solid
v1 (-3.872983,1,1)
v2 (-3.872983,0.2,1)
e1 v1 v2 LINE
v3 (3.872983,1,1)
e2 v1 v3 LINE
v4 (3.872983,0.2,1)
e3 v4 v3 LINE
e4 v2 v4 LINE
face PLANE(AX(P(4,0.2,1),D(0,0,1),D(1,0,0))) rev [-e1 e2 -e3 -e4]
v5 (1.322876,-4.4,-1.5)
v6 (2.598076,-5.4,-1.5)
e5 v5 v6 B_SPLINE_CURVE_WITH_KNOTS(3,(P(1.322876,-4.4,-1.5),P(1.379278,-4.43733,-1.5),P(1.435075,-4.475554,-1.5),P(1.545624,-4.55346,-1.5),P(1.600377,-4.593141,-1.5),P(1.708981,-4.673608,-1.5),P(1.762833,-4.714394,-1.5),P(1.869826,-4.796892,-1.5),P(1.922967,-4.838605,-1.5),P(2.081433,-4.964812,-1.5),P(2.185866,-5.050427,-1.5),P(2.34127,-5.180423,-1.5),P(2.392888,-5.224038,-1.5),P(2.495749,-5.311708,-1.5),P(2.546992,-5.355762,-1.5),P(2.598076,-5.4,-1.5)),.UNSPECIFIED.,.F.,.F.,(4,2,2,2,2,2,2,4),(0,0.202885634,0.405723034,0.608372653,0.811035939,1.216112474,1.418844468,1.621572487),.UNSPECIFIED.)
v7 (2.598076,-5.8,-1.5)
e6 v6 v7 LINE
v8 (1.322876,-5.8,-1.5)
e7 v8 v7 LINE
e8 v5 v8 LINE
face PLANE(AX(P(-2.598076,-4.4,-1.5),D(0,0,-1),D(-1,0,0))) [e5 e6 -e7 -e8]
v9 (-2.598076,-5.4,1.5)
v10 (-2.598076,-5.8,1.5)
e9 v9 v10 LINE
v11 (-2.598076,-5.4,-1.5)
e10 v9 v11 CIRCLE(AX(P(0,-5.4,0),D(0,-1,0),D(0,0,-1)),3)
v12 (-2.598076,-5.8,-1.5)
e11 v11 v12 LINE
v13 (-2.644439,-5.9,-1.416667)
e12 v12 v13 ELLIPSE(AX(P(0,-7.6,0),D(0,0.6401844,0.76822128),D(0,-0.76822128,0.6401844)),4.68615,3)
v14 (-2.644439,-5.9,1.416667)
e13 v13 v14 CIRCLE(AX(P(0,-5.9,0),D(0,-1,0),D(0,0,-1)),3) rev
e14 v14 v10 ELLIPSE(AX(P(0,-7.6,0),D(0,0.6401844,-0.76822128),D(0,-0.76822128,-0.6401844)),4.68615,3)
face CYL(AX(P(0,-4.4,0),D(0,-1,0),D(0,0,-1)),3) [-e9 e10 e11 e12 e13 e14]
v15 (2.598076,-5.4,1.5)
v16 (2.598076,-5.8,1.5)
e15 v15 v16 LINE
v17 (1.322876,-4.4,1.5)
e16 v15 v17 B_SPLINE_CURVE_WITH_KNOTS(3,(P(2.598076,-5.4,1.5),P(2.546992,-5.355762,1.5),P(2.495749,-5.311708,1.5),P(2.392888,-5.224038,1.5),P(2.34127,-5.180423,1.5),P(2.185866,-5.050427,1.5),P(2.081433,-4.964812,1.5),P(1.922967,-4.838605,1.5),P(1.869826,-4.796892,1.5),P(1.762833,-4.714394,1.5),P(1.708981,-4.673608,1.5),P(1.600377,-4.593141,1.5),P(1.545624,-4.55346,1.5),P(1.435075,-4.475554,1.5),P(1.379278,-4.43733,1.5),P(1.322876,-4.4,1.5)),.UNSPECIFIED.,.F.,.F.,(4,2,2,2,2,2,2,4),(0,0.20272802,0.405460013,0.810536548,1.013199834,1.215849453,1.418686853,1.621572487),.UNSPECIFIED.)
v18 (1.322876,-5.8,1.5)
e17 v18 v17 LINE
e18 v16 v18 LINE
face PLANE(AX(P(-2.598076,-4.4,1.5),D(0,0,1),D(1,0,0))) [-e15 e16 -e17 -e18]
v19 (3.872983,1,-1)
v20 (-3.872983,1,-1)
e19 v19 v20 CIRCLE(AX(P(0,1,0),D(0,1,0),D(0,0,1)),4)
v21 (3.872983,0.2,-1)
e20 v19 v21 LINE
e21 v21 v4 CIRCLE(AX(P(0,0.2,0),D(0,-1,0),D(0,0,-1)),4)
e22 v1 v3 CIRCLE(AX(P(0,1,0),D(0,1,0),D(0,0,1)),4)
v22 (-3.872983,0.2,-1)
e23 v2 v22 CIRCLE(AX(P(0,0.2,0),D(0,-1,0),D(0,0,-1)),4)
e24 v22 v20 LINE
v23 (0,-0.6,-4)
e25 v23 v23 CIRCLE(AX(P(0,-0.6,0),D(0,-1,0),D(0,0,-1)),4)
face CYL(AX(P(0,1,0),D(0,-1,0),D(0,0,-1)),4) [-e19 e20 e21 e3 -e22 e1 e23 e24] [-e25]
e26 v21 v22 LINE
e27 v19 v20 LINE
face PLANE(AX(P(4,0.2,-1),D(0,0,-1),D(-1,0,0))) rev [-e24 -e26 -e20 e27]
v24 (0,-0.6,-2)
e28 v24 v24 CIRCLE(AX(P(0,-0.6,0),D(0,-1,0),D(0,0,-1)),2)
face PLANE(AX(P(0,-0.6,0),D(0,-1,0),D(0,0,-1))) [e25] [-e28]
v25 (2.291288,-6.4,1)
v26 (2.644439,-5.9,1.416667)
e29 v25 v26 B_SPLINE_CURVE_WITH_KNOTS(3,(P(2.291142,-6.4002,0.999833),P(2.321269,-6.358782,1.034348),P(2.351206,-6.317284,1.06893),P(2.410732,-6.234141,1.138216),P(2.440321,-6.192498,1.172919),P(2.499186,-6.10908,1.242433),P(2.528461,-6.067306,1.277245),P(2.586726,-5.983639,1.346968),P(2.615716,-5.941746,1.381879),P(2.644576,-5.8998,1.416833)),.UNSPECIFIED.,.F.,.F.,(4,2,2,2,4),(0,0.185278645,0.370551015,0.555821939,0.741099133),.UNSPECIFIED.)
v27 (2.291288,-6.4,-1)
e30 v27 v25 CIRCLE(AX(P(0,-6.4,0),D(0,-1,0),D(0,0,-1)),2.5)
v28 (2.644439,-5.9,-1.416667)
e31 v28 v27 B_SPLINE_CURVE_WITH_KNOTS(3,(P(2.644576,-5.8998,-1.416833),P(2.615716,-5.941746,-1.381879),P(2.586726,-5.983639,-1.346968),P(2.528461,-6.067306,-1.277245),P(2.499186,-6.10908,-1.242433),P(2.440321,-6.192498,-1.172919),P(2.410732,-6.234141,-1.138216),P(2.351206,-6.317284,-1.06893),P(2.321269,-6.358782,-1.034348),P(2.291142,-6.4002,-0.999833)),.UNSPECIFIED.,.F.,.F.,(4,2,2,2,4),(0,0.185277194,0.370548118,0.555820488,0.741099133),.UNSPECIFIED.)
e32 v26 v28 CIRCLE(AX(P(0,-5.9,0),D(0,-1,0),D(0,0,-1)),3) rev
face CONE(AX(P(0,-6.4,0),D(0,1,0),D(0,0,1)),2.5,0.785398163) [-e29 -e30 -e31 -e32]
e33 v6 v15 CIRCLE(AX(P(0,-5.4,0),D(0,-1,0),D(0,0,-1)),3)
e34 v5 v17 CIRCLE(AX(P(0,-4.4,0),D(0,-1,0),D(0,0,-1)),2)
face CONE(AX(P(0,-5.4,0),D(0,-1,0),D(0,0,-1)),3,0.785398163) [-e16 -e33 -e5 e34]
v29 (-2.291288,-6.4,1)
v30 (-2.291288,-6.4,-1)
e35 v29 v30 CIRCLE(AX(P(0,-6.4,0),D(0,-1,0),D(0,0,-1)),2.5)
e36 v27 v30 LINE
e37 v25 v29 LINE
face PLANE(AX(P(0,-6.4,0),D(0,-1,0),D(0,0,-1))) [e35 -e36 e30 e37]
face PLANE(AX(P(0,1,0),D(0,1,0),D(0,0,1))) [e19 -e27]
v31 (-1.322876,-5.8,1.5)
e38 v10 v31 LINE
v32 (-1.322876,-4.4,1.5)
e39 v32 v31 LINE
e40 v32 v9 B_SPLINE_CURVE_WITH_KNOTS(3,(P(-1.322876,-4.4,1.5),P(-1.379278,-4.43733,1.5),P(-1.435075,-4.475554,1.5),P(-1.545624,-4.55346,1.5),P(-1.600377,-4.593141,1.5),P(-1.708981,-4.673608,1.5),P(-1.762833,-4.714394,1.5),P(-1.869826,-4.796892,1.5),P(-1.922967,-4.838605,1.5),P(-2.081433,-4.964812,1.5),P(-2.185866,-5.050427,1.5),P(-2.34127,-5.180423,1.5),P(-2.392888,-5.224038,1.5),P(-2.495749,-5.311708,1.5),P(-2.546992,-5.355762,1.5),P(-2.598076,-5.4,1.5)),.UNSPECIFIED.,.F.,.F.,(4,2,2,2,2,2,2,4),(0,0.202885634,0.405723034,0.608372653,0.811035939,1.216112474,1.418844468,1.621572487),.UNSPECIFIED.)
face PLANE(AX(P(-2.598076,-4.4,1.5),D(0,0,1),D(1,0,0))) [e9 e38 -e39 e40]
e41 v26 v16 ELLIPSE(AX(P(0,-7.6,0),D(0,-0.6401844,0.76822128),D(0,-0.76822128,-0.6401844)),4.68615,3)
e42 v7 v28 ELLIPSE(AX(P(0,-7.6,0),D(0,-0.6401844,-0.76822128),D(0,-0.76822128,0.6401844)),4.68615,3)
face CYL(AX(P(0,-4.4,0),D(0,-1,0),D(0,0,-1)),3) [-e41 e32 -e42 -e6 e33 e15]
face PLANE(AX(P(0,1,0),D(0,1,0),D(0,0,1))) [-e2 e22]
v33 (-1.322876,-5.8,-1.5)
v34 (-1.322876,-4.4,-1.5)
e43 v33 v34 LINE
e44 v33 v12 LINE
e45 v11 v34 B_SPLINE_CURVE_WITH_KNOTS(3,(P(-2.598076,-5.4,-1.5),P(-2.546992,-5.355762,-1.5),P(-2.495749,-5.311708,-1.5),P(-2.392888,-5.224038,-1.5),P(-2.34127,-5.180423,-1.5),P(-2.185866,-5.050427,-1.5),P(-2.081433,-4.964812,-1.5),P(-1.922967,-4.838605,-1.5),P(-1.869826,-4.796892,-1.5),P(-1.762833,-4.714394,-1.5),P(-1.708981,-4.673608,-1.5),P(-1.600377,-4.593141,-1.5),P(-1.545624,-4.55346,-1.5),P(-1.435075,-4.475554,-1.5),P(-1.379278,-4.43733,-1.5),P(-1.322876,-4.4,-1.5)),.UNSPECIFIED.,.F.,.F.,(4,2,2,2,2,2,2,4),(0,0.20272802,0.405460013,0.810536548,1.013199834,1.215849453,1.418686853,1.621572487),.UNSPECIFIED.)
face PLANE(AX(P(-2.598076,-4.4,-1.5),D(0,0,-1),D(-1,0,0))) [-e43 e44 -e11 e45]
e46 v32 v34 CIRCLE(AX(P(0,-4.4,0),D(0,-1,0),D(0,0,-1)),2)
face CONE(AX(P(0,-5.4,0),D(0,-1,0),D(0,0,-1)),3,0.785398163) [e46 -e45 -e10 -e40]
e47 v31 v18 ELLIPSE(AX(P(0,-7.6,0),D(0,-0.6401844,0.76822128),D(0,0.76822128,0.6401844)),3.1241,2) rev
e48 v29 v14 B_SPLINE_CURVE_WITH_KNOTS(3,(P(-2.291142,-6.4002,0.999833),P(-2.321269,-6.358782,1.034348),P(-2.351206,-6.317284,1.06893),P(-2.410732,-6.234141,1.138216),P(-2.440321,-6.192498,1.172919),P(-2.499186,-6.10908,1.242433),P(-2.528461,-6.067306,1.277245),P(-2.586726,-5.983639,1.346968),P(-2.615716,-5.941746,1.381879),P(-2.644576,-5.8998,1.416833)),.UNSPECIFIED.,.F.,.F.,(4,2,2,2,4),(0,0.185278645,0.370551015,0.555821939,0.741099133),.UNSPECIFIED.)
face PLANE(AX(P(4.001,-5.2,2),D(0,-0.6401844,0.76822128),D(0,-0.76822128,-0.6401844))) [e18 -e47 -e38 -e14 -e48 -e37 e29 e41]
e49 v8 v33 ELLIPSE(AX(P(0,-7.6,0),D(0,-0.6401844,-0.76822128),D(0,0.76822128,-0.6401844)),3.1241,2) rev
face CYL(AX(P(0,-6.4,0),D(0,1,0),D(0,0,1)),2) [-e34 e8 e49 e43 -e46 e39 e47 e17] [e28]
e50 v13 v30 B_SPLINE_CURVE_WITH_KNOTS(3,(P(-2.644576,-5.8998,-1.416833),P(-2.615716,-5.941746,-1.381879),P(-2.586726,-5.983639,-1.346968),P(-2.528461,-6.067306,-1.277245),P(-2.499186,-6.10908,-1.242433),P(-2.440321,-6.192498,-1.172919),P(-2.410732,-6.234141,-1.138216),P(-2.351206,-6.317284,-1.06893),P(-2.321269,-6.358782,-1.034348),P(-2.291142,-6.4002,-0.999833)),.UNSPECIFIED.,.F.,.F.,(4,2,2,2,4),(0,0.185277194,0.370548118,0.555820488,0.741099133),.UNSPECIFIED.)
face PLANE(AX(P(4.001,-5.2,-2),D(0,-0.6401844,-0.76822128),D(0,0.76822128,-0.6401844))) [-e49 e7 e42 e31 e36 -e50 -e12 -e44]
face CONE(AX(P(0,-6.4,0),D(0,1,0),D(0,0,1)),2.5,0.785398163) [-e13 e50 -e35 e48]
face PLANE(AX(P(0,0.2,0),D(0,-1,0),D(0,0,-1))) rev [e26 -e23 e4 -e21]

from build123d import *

# Parameters (mm, degrees)
SKETCH_1_R                      = 4
EXTRUDE_1_DEPTH                 = 1
SKETCH_3_R                      = 2
EXTRUDE_3_DEPTH                 = 6.4
EXTRUDE_4_DEPTH                 = 2
CHAMFER_1_SIZE                  = 0.5
CHAMFER_2_SIZE                  = 1
CUT_EXTRUDE_1_REACH             = 10.542
CUT_EXTRUDE_1_DIRECTION_2_REACH = 10.542
EXTRUDE_START                   = 0.6
SKETCH_6_R                      = 4
EXTRUDE_5_DEPTH                 = 0.6
SKETCH_7_W                      = 8
SKETCH_7_H                      = 2
CUT_EXTRUDE_2_DEPTH             = 0.8


with BuildPart() as part:
    # 草图1 → 凸台-拉伸1 (new body)
    with BuildSketch(Plane(origin=(0, 0, 0), x_dir=(1, 0, 0), z_dir=(0, 1, 0))):
        with Locations(Location((0, 0, 0), (0, 0, 270))):
            Circle(SKETCH_1_R)
    extrude(amount=EXTRUDE_1_DEPTH)

    # 草图3 → 凸台-拉伸3 (add)
    with BuildSketch(Plane(origin=(0, 0, 0), x_dir=(-1, 0, 0), z_dir=(0, -1, 0))):
        with Locations(Location((0, 0, 0), (0, 0, 270))):
            Circle(SKETCH_3_R)
    extrude(amount=EXTRUDE_3_DEPTH)

    # 草图4 → 凸台-拉伸4 (add)
    with BuildSketch(Plane(origin=(0, -6.4, 0), x_dir=(-1, 0, 0), z_dir=(0, -1, 0))):
        with BuildLine():
            Line((2.598076211, -1.5), (-2.598076211, -1.5))
            ThreePointArc((-2.598076211, -1.5), (-3, 0), (-2.598076211, 1.5))
            Line((-2.598076211, 1.5), (2.598076211, 1.5))
            ThreePointArc((2.598076211, 1.5), (3, 0), (2.598076211, -1.5))
        make_face()
    extrude(amount=-EXTRUDE_4_DEPTH)

    # 倒角1
    chamfer_1_edges = [part.edges().sort_by_distance(p)[0] for p in [
        (3, -6.4, 0),
        (-3, -6.4, 0),
    ]]
    chamfer(chamfer_1_edges, length=CHAMFER_1_SIZE)

    # 倒角2
    chamfer_2_edges = [part.edges().sort_by_distance(p)[0] for p in [
        (3, -4.4, 0),
        (-3, -4.4, 0),
    ]]
    chamfer(chamfer_2_edges, length=CHAMFER_2_SIZE - 0.0001)  # a hair under: the kernel refuses the full size

    # 草图5 → 切除-拉伸1 (cut, up to next)
    with BuildSketch(Plane(origin=(0, 0, 0), x_dir=(0, 0, -1), z_dir=(1, 0, 0)), mode=Mode.PRIVATE) as cut_extrude_1_sk1:
        Polygon((2, -5.2), (1, -6.4), (2, -6.4), align=None)
    cut_extrude_1_tool1 = extrude(cut_extrude_1_sk1.sketch, amount=-CUT_EXTRUDE_1_REACH, mode=Mode.PRIVATE) & part.part
    # 草图5 → 切除-拉伸1 (cut, up to next)
    with BuildSketch(Plane(origin=(0, 0, 0), x_dir=(0, 0, -1), z_dir=(1, 0, 0)), mode=Mode.PRIVATE) as cut_extrude_1_sk2:
        Polygon((-2, -5.2), (-2, -6.4), (-1, -6.4), align=None)
    cut_extrude_1_tool2 = extrude(cut_extrude_1_sk2.sketch, amount=-CUT_EXTRUDE_1_REACH, mode=Mode.PRIVATE) & part.part
    add(cut_extrude_1_tool1.solids().sort_by_distance((0, -6, -1.666667))[0], mode=Mode.SUBTRACT)
    add(cut_extrude_1_tool2.solids().sort_by_distance((0, -6, 1.666667))[0], mode=Mode.SUBTRACT)

    # 草图5 → 切除-拉伸1 direction 2 (cut, up to next)
    with BuildSketch(Plane(origin=(0, 0, 0), x_dir=(0, 0, -1), z_dir=(1, 0, 0)), mode=Mode.PRIVATE) as cut_extrude_1_direction_2_sk1:
        Polygon((2, -5.2), (1, -6.4), (2, -6.4), align=None)
    cut_extrude_1_direction_2_tool1 = extrude(cut_extrude_1_direction_2_sk1.sketch, amount=CUT_EXTRUDE_1_DIRECTION_2_REACH, mode=Mode.PRIVATE) & part.part
    # 草图5 → 切除-拉伸1 direction 2 (cut, up to next)
    with BuildSketch(Plane(origin=(0, 0, 0), x_dir=(0, 0, -1), z_dir=(1, 0, 0)), mode=Mode.PRIVATE) as cut_extrude_1_direction_2_sk2:
        Polygon((-2, -5.2), (-2, -6.4), (-1, -6.4), align=None)
    cut_extrude_1_direction_2_tool2 = extrude(cut_extrude_1_direction_2_sk2.sketch, amount=CUT_EXTRUDE_1_DIRECTION_2_REACH, mode=Mode.PRIVATE) & part.part
    add(cut_extrude_1_direction_2_tool1.solids().sort_by_distance((0, -6, -1.666667))[0], mode=Mode.SUBTRACT)
    add(cut_extrude_1_direction_2_tool2.solids().sort_by_distance((0, -6, 1.666667))[0], mode=Mode.SUBTRACT)

    # 草图6 → 凸台-拉伸5 (add)
    with BuildSketch(Plane.XZ.offset(EXTRUDE_START)):
        with Locations(Location((0, 0, 0), (0, 0, 270))):
            Circle(SKETCH_6_R)
    extrude(amount=-EXTRUDE_5_DEPTH)

    # 草图7 → 切除-拉伸2 (cut)
    with BuildSketch(Plane(origin=(0, 1, 0), x_dir=(1, 0, 0), z_dir=(0, 1, 0))):
        Rectangle(SKETCH_7_W, SKETCH_7_H)
    extrude(amount=-CUT_EXTRUDE_2_DEPTH, mode=Mode.SUBTRACT)


solid = part.part
